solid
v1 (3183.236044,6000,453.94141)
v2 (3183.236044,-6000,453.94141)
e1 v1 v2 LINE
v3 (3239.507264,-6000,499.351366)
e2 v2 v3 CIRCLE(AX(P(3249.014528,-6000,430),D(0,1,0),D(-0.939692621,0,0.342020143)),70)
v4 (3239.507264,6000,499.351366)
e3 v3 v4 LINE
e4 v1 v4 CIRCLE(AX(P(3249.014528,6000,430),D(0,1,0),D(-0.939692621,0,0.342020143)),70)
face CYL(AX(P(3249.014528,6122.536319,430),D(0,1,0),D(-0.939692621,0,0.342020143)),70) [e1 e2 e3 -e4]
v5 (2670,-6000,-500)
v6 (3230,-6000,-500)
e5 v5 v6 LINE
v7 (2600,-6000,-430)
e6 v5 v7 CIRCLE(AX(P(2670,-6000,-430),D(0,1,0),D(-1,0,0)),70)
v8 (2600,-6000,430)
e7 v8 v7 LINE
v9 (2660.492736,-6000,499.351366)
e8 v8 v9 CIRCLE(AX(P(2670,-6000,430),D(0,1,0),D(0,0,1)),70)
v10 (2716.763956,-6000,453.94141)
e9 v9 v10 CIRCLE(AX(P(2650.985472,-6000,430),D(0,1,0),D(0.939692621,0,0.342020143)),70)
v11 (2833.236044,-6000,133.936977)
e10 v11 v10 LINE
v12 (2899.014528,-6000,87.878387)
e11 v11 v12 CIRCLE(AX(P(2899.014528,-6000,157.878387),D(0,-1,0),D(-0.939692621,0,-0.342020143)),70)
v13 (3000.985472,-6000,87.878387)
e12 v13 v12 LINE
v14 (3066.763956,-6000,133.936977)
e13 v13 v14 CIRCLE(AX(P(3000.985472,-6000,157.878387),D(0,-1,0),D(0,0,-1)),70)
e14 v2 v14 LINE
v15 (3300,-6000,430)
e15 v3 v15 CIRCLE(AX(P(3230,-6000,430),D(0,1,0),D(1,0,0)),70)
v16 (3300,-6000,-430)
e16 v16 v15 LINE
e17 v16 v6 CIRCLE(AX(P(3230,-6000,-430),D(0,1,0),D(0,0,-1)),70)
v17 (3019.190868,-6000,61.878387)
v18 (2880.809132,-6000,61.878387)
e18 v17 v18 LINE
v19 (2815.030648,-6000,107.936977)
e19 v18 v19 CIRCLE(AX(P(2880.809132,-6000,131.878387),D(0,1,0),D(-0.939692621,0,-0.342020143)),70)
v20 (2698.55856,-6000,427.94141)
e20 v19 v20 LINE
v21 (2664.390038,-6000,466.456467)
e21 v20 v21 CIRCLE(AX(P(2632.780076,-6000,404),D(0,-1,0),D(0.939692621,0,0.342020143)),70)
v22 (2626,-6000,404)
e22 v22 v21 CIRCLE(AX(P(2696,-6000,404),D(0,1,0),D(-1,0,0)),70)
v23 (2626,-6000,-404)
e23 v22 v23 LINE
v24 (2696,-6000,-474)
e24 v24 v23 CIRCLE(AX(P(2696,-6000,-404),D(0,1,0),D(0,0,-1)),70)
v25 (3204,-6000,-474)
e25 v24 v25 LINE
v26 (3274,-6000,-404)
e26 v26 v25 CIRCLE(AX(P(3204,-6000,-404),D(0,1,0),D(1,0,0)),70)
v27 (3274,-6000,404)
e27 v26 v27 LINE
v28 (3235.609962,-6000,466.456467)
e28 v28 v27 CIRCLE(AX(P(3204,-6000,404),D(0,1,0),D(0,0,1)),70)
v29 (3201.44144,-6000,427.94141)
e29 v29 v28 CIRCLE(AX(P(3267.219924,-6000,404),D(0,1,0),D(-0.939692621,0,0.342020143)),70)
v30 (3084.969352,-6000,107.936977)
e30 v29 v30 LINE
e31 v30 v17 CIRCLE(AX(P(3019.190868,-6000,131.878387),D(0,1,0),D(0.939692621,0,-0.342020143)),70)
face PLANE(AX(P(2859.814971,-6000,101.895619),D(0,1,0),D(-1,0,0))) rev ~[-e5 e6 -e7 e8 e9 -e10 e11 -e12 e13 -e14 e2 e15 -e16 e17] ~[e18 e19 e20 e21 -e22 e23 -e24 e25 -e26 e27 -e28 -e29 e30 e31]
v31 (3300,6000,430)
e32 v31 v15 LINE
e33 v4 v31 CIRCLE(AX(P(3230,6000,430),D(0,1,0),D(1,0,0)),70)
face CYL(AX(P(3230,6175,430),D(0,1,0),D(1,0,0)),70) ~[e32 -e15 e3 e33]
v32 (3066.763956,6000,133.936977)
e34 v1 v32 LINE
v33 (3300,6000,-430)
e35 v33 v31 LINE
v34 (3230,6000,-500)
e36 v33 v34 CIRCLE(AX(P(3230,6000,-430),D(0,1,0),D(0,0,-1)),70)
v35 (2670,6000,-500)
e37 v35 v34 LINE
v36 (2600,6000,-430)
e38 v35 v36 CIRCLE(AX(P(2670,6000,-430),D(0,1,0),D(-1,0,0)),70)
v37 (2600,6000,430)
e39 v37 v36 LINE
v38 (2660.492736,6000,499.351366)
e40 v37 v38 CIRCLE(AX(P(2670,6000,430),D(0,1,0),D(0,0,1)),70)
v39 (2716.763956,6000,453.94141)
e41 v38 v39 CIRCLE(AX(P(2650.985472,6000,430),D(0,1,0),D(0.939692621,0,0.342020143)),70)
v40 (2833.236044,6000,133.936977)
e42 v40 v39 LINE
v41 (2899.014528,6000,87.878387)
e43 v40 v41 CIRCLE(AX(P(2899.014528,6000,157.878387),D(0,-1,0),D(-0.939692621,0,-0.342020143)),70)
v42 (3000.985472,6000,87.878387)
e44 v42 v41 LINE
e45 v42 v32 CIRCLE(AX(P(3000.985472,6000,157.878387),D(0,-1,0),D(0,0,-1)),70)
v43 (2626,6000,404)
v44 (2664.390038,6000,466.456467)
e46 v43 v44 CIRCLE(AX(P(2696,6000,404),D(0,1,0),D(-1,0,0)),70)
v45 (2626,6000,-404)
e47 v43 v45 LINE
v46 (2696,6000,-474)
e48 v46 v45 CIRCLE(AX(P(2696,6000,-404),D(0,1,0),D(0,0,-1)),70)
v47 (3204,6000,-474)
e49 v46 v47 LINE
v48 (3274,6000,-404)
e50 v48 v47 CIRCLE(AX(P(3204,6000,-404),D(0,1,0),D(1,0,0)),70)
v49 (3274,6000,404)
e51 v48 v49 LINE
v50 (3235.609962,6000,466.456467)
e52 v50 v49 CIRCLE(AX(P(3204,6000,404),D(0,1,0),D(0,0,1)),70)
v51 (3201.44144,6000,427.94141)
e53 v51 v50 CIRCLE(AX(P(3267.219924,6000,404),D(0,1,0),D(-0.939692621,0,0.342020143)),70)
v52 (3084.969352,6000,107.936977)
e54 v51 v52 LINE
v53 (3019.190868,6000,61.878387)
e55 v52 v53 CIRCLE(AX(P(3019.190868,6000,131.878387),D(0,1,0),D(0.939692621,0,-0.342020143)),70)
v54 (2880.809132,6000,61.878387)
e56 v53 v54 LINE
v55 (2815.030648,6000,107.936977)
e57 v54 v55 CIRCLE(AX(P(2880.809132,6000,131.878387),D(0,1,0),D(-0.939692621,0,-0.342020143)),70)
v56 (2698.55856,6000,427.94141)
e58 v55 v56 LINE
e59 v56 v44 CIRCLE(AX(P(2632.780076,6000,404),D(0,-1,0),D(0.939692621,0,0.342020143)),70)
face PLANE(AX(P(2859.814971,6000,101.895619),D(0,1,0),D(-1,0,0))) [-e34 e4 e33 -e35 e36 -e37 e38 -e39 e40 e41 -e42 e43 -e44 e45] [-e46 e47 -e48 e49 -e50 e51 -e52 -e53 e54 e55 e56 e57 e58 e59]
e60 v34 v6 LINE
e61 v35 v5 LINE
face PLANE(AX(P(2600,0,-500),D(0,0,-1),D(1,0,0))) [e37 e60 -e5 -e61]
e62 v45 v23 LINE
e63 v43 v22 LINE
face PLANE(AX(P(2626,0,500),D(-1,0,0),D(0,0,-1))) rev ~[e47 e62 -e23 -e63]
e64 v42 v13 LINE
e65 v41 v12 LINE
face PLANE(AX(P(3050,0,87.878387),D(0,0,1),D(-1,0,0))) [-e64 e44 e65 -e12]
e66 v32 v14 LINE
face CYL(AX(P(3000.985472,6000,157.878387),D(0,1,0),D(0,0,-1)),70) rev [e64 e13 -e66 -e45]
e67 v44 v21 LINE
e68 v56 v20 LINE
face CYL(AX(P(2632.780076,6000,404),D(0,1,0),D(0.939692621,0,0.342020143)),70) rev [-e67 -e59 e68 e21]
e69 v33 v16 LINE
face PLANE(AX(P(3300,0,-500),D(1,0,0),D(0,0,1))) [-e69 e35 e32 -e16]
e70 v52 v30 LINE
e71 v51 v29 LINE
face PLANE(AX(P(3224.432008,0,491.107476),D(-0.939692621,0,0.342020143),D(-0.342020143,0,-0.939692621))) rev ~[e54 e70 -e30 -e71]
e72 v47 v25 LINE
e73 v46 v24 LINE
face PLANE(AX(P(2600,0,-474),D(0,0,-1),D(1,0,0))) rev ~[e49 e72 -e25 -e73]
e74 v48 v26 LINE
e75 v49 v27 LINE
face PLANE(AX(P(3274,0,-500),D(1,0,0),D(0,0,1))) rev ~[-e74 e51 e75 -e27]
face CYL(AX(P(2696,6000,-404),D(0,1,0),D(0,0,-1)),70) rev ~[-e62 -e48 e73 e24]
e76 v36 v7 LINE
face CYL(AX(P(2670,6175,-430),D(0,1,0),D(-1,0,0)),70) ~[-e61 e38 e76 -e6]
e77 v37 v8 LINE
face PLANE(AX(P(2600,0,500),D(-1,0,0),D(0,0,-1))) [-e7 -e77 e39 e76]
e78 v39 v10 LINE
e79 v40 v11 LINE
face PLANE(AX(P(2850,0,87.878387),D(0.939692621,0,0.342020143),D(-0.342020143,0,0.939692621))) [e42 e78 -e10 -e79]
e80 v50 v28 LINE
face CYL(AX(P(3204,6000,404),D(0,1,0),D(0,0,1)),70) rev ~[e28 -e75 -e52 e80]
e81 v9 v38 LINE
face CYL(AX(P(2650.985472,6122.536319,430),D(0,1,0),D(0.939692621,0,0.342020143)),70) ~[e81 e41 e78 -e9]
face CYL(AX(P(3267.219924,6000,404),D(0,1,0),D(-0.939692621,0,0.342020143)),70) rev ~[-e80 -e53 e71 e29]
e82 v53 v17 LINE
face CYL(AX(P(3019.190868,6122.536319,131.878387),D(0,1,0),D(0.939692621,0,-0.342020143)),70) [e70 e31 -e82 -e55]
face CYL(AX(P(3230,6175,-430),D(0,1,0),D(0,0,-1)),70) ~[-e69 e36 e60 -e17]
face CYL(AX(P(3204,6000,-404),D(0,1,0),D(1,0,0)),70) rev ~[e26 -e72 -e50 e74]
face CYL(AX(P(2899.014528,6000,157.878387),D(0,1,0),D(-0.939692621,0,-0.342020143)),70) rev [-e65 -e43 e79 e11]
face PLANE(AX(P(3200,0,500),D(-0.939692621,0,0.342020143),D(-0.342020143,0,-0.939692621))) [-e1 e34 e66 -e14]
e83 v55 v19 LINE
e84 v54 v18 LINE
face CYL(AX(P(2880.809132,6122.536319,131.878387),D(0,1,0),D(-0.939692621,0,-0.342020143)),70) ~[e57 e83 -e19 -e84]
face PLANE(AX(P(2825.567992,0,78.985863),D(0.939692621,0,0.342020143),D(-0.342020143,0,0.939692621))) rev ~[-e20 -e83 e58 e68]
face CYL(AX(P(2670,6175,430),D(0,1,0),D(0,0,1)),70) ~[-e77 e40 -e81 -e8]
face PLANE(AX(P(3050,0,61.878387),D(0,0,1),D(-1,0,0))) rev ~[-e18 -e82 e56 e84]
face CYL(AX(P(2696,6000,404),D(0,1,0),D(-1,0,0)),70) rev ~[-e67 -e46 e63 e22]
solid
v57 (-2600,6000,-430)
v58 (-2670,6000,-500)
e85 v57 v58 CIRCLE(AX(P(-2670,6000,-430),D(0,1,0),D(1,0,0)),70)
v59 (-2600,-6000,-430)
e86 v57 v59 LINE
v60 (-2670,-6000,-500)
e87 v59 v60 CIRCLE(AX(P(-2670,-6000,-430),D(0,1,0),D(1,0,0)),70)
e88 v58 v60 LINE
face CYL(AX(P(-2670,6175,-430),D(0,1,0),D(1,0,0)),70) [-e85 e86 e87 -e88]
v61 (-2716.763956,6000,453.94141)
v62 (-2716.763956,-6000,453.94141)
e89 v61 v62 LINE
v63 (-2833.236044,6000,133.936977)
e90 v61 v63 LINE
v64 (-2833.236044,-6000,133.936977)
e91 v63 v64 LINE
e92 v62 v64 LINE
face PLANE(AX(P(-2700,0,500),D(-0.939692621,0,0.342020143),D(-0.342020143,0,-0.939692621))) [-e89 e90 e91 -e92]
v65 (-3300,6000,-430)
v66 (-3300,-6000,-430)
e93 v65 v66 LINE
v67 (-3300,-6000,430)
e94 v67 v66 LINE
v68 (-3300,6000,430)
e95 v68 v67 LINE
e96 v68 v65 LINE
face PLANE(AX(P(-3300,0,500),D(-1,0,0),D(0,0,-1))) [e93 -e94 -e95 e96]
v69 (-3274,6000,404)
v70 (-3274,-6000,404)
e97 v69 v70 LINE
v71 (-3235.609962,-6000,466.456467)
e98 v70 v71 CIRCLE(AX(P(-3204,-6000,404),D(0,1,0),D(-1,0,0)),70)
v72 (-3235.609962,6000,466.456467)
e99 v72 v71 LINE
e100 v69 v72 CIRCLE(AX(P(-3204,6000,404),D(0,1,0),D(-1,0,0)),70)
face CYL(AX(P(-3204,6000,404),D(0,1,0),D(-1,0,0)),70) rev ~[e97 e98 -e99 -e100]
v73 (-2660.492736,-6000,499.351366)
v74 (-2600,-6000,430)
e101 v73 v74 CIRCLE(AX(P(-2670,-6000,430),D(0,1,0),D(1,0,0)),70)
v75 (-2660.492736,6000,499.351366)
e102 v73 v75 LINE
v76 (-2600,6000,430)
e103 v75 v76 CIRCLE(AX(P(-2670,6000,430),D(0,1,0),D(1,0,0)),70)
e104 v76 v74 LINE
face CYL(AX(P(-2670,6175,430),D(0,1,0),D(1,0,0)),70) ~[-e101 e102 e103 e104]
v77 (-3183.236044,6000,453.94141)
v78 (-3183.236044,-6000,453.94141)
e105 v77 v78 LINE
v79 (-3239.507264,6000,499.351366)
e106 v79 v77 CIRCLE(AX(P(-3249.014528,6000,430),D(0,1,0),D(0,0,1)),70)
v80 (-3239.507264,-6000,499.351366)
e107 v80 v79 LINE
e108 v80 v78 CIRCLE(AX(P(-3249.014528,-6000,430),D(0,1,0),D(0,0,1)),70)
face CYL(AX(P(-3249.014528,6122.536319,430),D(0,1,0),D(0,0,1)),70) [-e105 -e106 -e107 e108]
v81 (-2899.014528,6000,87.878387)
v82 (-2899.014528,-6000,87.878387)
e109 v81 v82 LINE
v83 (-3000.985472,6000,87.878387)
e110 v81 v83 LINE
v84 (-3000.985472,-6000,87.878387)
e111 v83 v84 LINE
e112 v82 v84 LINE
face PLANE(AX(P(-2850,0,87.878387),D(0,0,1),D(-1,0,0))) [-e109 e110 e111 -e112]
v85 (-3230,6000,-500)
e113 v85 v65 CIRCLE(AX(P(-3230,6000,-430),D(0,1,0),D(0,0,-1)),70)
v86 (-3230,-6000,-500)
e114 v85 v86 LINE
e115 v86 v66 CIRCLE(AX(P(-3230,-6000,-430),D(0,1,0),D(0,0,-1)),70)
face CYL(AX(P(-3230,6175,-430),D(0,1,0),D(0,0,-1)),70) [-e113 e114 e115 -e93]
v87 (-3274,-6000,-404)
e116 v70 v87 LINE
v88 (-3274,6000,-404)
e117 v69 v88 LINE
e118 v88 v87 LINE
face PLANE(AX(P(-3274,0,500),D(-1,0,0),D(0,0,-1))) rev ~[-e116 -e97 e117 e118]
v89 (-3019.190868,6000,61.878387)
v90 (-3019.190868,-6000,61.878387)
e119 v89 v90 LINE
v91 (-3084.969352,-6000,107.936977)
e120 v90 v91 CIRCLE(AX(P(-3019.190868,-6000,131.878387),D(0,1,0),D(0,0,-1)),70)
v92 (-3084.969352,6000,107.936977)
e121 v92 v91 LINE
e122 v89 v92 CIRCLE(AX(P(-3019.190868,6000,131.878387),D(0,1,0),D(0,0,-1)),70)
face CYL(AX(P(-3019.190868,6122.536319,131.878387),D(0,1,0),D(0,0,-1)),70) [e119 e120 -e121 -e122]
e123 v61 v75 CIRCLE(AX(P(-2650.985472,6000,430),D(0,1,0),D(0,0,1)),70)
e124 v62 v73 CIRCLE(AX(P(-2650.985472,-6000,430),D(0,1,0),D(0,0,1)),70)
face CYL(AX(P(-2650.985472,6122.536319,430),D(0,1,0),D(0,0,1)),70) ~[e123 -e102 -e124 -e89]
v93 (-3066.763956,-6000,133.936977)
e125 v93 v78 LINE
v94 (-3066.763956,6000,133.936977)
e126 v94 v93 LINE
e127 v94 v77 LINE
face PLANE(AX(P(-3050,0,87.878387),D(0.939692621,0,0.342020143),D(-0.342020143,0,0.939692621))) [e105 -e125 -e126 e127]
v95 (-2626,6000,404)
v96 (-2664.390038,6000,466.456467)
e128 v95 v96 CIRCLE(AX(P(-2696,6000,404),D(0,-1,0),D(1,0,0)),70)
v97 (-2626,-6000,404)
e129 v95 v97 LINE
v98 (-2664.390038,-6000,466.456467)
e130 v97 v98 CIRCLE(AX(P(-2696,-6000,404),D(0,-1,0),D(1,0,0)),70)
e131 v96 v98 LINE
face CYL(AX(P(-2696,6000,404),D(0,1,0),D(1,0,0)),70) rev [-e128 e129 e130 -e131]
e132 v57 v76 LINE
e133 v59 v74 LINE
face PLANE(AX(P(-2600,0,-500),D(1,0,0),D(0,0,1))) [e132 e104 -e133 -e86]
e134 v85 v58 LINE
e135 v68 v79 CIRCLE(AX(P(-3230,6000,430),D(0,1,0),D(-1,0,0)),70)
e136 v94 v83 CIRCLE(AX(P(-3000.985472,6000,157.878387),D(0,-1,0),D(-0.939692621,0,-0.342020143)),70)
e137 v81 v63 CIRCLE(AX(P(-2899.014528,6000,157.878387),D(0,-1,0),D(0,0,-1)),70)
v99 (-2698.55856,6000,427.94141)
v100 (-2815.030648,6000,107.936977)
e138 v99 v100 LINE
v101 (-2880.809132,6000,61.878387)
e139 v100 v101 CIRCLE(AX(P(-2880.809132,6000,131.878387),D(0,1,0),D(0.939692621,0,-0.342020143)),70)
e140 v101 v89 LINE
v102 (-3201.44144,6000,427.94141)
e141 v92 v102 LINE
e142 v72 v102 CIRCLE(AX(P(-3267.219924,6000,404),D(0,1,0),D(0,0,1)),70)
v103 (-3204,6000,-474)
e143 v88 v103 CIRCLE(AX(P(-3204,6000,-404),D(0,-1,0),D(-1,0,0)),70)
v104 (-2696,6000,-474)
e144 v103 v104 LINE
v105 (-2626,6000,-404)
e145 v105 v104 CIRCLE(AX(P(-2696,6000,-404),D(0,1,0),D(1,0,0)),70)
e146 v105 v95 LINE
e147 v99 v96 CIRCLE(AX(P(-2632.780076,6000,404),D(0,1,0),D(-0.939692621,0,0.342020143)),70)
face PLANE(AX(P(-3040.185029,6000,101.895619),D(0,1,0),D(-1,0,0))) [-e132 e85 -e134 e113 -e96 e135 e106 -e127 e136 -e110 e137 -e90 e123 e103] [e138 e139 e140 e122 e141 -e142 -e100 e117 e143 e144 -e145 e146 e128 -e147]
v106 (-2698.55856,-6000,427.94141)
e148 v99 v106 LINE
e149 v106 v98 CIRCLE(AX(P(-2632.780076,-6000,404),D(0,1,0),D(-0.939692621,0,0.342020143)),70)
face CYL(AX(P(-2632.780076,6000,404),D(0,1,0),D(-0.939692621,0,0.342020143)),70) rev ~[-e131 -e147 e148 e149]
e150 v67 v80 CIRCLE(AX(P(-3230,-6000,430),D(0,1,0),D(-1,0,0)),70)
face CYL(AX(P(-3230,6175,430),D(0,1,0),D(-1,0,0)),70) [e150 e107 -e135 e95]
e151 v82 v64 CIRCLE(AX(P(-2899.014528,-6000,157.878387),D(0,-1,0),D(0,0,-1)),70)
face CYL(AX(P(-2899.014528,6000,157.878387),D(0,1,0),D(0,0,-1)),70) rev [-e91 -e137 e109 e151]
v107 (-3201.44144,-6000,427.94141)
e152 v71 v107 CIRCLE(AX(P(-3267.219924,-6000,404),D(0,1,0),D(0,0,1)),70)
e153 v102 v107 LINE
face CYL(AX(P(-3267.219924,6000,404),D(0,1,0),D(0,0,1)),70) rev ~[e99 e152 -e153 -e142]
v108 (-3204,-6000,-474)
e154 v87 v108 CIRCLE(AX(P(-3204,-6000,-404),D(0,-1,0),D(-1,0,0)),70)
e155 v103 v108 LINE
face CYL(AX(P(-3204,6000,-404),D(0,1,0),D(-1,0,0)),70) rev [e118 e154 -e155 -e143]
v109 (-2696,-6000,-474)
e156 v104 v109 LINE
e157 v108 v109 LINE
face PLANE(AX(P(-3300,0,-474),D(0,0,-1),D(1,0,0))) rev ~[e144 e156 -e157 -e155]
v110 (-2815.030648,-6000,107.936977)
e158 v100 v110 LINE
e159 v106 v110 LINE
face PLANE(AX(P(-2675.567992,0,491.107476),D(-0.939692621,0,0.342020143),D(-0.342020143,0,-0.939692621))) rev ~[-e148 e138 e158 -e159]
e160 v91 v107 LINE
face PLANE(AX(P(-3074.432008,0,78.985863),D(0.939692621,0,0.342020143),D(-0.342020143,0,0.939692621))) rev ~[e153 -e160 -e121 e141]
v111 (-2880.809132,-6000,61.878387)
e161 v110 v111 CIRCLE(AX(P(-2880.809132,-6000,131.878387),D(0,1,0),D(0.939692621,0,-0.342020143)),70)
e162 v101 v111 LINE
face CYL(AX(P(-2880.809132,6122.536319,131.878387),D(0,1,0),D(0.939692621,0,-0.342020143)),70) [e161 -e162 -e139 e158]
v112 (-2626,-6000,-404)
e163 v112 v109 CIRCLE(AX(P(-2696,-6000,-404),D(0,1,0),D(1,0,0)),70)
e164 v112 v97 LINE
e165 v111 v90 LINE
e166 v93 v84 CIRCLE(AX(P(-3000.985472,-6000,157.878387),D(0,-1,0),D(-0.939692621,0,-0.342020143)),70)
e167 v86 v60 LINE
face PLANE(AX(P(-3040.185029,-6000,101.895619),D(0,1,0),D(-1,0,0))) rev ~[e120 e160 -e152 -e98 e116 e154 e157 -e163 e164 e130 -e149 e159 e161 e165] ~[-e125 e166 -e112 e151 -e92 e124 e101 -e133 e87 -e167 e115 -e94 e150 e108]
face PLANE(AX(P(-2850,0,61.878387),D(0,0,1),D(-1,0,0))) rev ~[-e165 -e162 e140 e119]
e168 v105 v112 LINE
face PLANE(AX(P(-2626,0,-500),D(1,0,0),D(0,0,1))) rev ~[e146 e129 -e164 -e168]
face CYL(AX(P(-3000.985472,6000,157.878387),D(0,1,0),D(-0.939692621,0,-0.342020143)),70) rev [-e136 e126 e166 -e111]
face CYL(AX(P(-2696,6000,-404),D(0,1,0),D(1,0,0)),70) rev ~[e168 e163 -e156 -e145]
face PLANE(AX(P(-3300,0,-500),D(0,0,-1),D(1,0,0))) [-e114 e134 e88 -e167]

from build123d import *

# Parameters (mm, degrees)
F1_DEPTH    = 6000
F2_T        = -26
F2_2_T      = -26
F3_T1_DEPTH = 12000
F3_T3_DEPTH = 12350
F3_T5_DEPTH = 12245.0726383734
F4_T1_DEPTH = 12000
F4_T3_DEPTH = 12350
F4_T5_DEPTH = 12245.0726383734


# Not quite as in the source:
# - a fillet or chamfer that OpenCascade refuses, or shapes differently, is made with other operations: its cross-section is extruded or revolved along the edge and cut away or added
# - a feature names something its author has since deleted; it is built from what else it names


with BuildPart() as f1:
    # F0 (on Front) → F1 (new body, symmetric)
    with BuildSketch(Plane.XZ):
        Polygon((2700, 500), (2600, 500), (2600, 200), (2600, 0), (2600, -200), (2600, -500), (3300, -500), (3300, 500), (3200, 500), (3050, 87.8783870818), (2850, 87.8783870818), align=None)
    extrude(amount=F1_DEPTH, both=True)

    # F2
    f2_openings = [f1.faces().sort_by_distance(p)[0] for p in [
        (2950, -6000, -83.929869),
        (2950, 6000, -83.929869),
    ]]
    offset(amount=F2_T, openings=f2_openings, kind=Kind.INTERSECTION)

    # F3: fillet of radius 70 on 16 edges, made by hand

    # F3_s2 → F3_t1 (join)
    with BuildSketch(Plane.XZ.offset(-6000)):
        with BuildLine():
            ThreePointArc((2833.2360442197, 133.936977049), (2858.8641771301, 100.5377439816), (2899.0145276747, 87.8783870818))
            Line((2899.0145276747, 87.8783870818), (2850, 87.8783870818))
            Line((2850, 87.8783870818), (2833.2360442197, 133.936977049))
        make_face()
        with BuildLine():
            ThreePointArc((2696, -474), (2646.5025253169, -453.4974746831), (2626, -404))
            Line((2626, -404), (2626, -474))
            Line((2626, -474), (2696, -474))
        make_face()
        with BuildLine():
            ThreePointArc((3201.4414402131, 427.9414100328), (3227.0695731236, 461.3406431002), (3267.2199236681, 474))
            Line((3267.2199236681, 474), (3218.2053959935, 474))
            Line((3218.2053959935, 474), (3201.4414402131, 427.9414100328))
        make_face()
        with BuildLine():
            ThreePointArc((3204, 474), (3253.4974746831, 453.4974746831), (3274, 404))
            Line((3274, 404), (3274, 474))
            Line((3274, 474), (3204, 474))
        make_face()
        with BuildLine():
            ThreePointArc((2698.5585597869, 427.9414100328), (2672.9304268764, 461.3406431002), (2632.7800763319, 474))
            Line((2632.7800763319, 474), (2681.7946040065, 474))
            Line((2681.7946040065, 474), (2698.5585597869, 427.9414100328))
        make_face()
        with BuildLine():
            ThreePointArc((2626, 404), (2646.5025253169, 453.4974746831), (2696, 474))
            Line((2696, 474), (2626, 474))
            Line((2626, 474), (2626, 404))
        make_face()
        with BuildLine():
            ThreePointArc((3274, -404), (3253.4974746831, -453.4974746831), (3204, -474))
            Line((3204, -474), (3274, -474))
            Line((3274, -474), (3274, -404))
        make_face()
        with BuildLine():
            ThreePointArc((3000.9854723253, 87.8783870818), (3041.1358228699, 100.5377439816), (3066.7639557803, 133.936977049))
            Line((3066.7639557803, 133.936977049), (3050, 87.8783870818))
            Line((3050, 87.8783870818), (3000.9854723253, 87.8783870818))
        make_face()
    extrude(amount=F3_T1_DEPTH)

    # F3_s4 → F3_t3 (cut)
    with BuildSketch(Plane.XZ.offset(-6175)):
        with BuildLine():
            ThreePointArc((3300, 430), (3279.4974746831, 479.4974746831), (3230, 500))
            Line((3230, 500), (3300, 500))
            Line((3300, 500), (3300, 430))
        make_face()
        with BuildLine():
            ThreePointArc((2670, 500), (2620.5025253169, 479.4974746831), (2600, 430))
            Line((2600, 430), (2600, 500))
            Line((2600, 500), (2670, 500))
        make_face()
        with BuildLine():
            ThreePointArc((3230, -500), (3279.4974746831, -479.4974746831), (3300, -430))
            Line((3300, -430), (3300, -500))
            Line((3300, -500), (3230, -500))
        make_face()
        with BuildLine():
            ThreePointArc((2600, -430), (2620.5025253169, -479.4974746831), (2670, -500))
            Line((2670, -500), (2600, -500))
            Line((2600, -500), (2600, -430))
        make_face()
    extrude(amount=F3_T3_DEPTH, mode=Mode.SUBTRACT)

    # F3_s6 → F3_t5 (cut)
    with BuildSketch(Plane.XZ.offset(-6122.5363191867)):
        with BuildLine():
            ThreePointArc((2716.7639557803, 453.9414100328), (2691.1358228699, 487.3406431002), (2650.9854723253, 500))
            Line((2650.9854723253, 500), (2700, 500))
            Line((2700, 500), (2716.7639557803, 453.9414100328))
        make_face()
        with BuildLine():
            ThreePointArc((3183.2360442197, 453.9414100328), (3208.8641771301, 487.3406431002), (3249.0145276747, 500))
            Line((3249.0145276747, 500), (3200, 500))
            Line((3200, 500), (3183.2360442197, 453.9414100328))
        make_face()
        with BuildLine():
            ThreePointArc((3084.9693517738, 107.936977049), (3059.3412188633, 74.5377439816), (3019.1908683188, 61.8783870818))
            Line((3019.1908683188, 61.8783870818), (3068.2053959935, 61.8783870818))
            Line((3068.2053959935, 61.8783870818), (3084.9693517738, 107.936977049))
        make_face()
        with BuildLine():
            ThreePointArc((2815.0306482262, 107.936977049), (2840.6587811367, 74.5377439816), (2880.8091316812, 61.8783870818))
            Line((2880.8091316812, 61.8783870818), (2831.7946040065, 61.8783870818))
            Line((2831.7946040065, 61.8783870818), (2815.0306482262, 107.936977049))
        make_face()
    extrude(amount=F3_T5_DEPTH, mode=Mode.SUBTRACT)


with BuildPart() as f1b:
    # F0 (on Front) → F1, piece 2 (new body, symmetric)
    with BuildSketch(Plane.XZ):
        Polygon((-2600, -200), (-2600, 0), (-2600, 200), (-2600, 500), (-2700, 500), (-2850, 87.8783870818), (-3050, 87.8783870818), (-3200, 500), (-3300, 500), (-3300, -500), (-2600, -500), align=None)
    extrude(amount=F1_DEPTH, both=True)

    # F2#2
    f2_2_openings = [f1b.faces().sort_by_distance(p)[0] for p in [
        (-2950, -6000, -83.929869),
        (-2950, 6000, -83.929869),
    ]]
    offset(amount=F2_2_T, openings=f2_2_openings, kind=Kind.INTERSECTION)

    # F4: fillet of radius 70 on 16 edges, made by hand

    # F4_s2 → F4_t1 (join)
    with BuildSketch(Plane.XZ.offset(-6000)):
        with BuildLine():
            ThreePointArc((-3066.7639557803, 133.936977049), (-3041.1358228699, 100.5377439816), (-3000.9854723253, 87.8783870818))
            Line((-3000.9854723253, 87.8783870818), (-3050, 87.8783870818))
            Line((-3050, 87.8783870818), (-3066.7639557803, 133.936977049))
        make_face()
        with BuildLine():
            ThreePointArc((-3274, -404), (-3253.4974746831, -453.4974746831), (-3204, -474))
            Line((-3204, -474), (-3274, -474))
            Line((-3274, -474), (-3274, -404))
        make_face()
        with BuildLine():
            ThreePointArc((-2626, -404), (-2646.5025253169, -453.4974746831), (-2696, -474))
            Line((-2696, -474), (-2626, -474))
            Line((-2626, -474), (-2626, -404))
        make_face()
        with BuildLine():
            ThreePointArc((-2899.0145276747, 87.8783870818), (-2858.8641771301, 100.5377439816), (-2833.2360442197, 133.936977049))
            Line((-2833.2360442197, 133.936977049), (-2850, 87.8783870818))
            Line((-2850, 87.8783870818), (-2899.0145276747, 87.8783870818))
        make_face()
        with BuildLine():
            ThreePointArc((-3267.2199236681, 474), (-3227.0695731236, 461.3406431002), (-3201.4414402131, 427.9414100328))
            Line((-3201.4414402131, 427.9414100328), (-3218.2053959935, 474))
            Line((-3218.2053959935, 474), (-3267.2199236681, 474))
        make_face()
        with BuildLine():
            ThreePointArc((-2698.5585597869, 427.9414100328), (-2672.9304268764, 461.3406431002), (-2632.7800763319, 474))
            Line((-2632.7800763319, 474), (-2681.7946040065, 474))
            Line((-2681.7946040065, 474), (-2698.5585597869, 427.9414100328))
        make_face()
        with BuildLine():
            ThreePointArc((-2626, 404), (-2646.5025253169, 453.4974746831), (-2696, 474))
            Line((-2696, 474), (-2626, 474))
            Line((-2626, 474), (-2626, 404))
        make_face()
        with BuildLine():
            ThreePointArc((-3274, 404), (-3253.4974746831, 453.4974746831), (-3204, 474))
            Line((-3204, 474), (-3274, 474))
            Line((-3274, 474), (-3274, 404))
        make_face()
    extrude(amount=F4_T1_DEPTH)

    # F4_s4 → F4_t3 (cut)
    with BuildSketch(Plane.XZ.offset(-6175)):
        with BuildLine():
            ThreePointArc((-2600, 430), (-2620.5025253169, 479.4974746831), (-2670, 500))
            Line((-2670, 500), (-2600, 500))
            Line((-2600, 500), (-2600, 430))
        make_face()
        with BuildLine():
            ThreePointArc((-3300, 430), (-3279.4974746831, 479.4974746831), (-3230, 500))
            Line((-3230, 500), (-3300, 500))
            Line((-3300, 500), (-3300, 430))
        make_face()
        with BuildLine():
            ThreePointArc((-2600, -430), (-2620.5025253169, -479.4974746831), (-2670, -500))
            Line((-2670, -500), (-2600, -500))
            Line((-2600, -500), (-2600, -430))
        make_face()
        with BuildLine():
            ThreePointArc((-3230, -500), (-3279.4974746831, -479.4974746831), (-3300, -430))
            Line((-3300, -430), (-3300, -500))
            Line((-3300, -500), (-3230, -500))
        make_face()
    extrude(amount=F4_T3_DEPTH, mode=Mode.SUBTRACT)

    # F4_s6 → F4_t5 (cut)
    with BuildSketch(Plane.XZ.offset(-6122.5363191867)):
        with BuildLine():
            ThreePointArc((-2650.9854723253, 500), (-2691.1358228699, 487.3406431002), (-2716.7639557803, 453.9414100328))
            Line((-2716.7639557803, 453.9414100328), (-2700, 500))
            Line((-2700, 500), (-2650.9854723253, 500))
        make_face()
        with BuildLine():
            ThreePointArc((-3249.0145276747, 500), (-3208.8641771301, 487.3406431002), (-3183.2360442197, 453.9414100328))
            Line((-3183.2360442197, 453.9414100328), (-3200, 500))
            Line((-3200, 500), (-3249.0145276747, 500))
        make_face()
        with BuildLine():
            ThreePointArc((-2815.0306482262, 107.936977049), (-2840.6587811367, 74.5377439816), (-2880.8091316812, 61.8783870818))
            Line((-2880.8091316812, 61.8783870818), (-2831.7946040065, 61.8783870818))
            Line((-2831.7946040065, 61.8783870818), (-2815.0306482262, 107.936977049))
        make_face()
        with BuildLine():
            ThreePointArc((-3019.1908683188, 61.8783870818), (-3059.3412188633, 74.5377439816), (-3084.9693517738, 107.936977049))
            Line((-3084.9693517738, 107.936977049), (-3068.2053959935, 61.8783870818))
            Line((-3068.2053959935, 61.8783870818), (-3019.1908683188, 61.8783870818))
        make_face()
    extrude(amount=F4_T5_DEPTH, mode=Mode.SUBTRACT)


solid = Compound([f1.part, f1b.part])
